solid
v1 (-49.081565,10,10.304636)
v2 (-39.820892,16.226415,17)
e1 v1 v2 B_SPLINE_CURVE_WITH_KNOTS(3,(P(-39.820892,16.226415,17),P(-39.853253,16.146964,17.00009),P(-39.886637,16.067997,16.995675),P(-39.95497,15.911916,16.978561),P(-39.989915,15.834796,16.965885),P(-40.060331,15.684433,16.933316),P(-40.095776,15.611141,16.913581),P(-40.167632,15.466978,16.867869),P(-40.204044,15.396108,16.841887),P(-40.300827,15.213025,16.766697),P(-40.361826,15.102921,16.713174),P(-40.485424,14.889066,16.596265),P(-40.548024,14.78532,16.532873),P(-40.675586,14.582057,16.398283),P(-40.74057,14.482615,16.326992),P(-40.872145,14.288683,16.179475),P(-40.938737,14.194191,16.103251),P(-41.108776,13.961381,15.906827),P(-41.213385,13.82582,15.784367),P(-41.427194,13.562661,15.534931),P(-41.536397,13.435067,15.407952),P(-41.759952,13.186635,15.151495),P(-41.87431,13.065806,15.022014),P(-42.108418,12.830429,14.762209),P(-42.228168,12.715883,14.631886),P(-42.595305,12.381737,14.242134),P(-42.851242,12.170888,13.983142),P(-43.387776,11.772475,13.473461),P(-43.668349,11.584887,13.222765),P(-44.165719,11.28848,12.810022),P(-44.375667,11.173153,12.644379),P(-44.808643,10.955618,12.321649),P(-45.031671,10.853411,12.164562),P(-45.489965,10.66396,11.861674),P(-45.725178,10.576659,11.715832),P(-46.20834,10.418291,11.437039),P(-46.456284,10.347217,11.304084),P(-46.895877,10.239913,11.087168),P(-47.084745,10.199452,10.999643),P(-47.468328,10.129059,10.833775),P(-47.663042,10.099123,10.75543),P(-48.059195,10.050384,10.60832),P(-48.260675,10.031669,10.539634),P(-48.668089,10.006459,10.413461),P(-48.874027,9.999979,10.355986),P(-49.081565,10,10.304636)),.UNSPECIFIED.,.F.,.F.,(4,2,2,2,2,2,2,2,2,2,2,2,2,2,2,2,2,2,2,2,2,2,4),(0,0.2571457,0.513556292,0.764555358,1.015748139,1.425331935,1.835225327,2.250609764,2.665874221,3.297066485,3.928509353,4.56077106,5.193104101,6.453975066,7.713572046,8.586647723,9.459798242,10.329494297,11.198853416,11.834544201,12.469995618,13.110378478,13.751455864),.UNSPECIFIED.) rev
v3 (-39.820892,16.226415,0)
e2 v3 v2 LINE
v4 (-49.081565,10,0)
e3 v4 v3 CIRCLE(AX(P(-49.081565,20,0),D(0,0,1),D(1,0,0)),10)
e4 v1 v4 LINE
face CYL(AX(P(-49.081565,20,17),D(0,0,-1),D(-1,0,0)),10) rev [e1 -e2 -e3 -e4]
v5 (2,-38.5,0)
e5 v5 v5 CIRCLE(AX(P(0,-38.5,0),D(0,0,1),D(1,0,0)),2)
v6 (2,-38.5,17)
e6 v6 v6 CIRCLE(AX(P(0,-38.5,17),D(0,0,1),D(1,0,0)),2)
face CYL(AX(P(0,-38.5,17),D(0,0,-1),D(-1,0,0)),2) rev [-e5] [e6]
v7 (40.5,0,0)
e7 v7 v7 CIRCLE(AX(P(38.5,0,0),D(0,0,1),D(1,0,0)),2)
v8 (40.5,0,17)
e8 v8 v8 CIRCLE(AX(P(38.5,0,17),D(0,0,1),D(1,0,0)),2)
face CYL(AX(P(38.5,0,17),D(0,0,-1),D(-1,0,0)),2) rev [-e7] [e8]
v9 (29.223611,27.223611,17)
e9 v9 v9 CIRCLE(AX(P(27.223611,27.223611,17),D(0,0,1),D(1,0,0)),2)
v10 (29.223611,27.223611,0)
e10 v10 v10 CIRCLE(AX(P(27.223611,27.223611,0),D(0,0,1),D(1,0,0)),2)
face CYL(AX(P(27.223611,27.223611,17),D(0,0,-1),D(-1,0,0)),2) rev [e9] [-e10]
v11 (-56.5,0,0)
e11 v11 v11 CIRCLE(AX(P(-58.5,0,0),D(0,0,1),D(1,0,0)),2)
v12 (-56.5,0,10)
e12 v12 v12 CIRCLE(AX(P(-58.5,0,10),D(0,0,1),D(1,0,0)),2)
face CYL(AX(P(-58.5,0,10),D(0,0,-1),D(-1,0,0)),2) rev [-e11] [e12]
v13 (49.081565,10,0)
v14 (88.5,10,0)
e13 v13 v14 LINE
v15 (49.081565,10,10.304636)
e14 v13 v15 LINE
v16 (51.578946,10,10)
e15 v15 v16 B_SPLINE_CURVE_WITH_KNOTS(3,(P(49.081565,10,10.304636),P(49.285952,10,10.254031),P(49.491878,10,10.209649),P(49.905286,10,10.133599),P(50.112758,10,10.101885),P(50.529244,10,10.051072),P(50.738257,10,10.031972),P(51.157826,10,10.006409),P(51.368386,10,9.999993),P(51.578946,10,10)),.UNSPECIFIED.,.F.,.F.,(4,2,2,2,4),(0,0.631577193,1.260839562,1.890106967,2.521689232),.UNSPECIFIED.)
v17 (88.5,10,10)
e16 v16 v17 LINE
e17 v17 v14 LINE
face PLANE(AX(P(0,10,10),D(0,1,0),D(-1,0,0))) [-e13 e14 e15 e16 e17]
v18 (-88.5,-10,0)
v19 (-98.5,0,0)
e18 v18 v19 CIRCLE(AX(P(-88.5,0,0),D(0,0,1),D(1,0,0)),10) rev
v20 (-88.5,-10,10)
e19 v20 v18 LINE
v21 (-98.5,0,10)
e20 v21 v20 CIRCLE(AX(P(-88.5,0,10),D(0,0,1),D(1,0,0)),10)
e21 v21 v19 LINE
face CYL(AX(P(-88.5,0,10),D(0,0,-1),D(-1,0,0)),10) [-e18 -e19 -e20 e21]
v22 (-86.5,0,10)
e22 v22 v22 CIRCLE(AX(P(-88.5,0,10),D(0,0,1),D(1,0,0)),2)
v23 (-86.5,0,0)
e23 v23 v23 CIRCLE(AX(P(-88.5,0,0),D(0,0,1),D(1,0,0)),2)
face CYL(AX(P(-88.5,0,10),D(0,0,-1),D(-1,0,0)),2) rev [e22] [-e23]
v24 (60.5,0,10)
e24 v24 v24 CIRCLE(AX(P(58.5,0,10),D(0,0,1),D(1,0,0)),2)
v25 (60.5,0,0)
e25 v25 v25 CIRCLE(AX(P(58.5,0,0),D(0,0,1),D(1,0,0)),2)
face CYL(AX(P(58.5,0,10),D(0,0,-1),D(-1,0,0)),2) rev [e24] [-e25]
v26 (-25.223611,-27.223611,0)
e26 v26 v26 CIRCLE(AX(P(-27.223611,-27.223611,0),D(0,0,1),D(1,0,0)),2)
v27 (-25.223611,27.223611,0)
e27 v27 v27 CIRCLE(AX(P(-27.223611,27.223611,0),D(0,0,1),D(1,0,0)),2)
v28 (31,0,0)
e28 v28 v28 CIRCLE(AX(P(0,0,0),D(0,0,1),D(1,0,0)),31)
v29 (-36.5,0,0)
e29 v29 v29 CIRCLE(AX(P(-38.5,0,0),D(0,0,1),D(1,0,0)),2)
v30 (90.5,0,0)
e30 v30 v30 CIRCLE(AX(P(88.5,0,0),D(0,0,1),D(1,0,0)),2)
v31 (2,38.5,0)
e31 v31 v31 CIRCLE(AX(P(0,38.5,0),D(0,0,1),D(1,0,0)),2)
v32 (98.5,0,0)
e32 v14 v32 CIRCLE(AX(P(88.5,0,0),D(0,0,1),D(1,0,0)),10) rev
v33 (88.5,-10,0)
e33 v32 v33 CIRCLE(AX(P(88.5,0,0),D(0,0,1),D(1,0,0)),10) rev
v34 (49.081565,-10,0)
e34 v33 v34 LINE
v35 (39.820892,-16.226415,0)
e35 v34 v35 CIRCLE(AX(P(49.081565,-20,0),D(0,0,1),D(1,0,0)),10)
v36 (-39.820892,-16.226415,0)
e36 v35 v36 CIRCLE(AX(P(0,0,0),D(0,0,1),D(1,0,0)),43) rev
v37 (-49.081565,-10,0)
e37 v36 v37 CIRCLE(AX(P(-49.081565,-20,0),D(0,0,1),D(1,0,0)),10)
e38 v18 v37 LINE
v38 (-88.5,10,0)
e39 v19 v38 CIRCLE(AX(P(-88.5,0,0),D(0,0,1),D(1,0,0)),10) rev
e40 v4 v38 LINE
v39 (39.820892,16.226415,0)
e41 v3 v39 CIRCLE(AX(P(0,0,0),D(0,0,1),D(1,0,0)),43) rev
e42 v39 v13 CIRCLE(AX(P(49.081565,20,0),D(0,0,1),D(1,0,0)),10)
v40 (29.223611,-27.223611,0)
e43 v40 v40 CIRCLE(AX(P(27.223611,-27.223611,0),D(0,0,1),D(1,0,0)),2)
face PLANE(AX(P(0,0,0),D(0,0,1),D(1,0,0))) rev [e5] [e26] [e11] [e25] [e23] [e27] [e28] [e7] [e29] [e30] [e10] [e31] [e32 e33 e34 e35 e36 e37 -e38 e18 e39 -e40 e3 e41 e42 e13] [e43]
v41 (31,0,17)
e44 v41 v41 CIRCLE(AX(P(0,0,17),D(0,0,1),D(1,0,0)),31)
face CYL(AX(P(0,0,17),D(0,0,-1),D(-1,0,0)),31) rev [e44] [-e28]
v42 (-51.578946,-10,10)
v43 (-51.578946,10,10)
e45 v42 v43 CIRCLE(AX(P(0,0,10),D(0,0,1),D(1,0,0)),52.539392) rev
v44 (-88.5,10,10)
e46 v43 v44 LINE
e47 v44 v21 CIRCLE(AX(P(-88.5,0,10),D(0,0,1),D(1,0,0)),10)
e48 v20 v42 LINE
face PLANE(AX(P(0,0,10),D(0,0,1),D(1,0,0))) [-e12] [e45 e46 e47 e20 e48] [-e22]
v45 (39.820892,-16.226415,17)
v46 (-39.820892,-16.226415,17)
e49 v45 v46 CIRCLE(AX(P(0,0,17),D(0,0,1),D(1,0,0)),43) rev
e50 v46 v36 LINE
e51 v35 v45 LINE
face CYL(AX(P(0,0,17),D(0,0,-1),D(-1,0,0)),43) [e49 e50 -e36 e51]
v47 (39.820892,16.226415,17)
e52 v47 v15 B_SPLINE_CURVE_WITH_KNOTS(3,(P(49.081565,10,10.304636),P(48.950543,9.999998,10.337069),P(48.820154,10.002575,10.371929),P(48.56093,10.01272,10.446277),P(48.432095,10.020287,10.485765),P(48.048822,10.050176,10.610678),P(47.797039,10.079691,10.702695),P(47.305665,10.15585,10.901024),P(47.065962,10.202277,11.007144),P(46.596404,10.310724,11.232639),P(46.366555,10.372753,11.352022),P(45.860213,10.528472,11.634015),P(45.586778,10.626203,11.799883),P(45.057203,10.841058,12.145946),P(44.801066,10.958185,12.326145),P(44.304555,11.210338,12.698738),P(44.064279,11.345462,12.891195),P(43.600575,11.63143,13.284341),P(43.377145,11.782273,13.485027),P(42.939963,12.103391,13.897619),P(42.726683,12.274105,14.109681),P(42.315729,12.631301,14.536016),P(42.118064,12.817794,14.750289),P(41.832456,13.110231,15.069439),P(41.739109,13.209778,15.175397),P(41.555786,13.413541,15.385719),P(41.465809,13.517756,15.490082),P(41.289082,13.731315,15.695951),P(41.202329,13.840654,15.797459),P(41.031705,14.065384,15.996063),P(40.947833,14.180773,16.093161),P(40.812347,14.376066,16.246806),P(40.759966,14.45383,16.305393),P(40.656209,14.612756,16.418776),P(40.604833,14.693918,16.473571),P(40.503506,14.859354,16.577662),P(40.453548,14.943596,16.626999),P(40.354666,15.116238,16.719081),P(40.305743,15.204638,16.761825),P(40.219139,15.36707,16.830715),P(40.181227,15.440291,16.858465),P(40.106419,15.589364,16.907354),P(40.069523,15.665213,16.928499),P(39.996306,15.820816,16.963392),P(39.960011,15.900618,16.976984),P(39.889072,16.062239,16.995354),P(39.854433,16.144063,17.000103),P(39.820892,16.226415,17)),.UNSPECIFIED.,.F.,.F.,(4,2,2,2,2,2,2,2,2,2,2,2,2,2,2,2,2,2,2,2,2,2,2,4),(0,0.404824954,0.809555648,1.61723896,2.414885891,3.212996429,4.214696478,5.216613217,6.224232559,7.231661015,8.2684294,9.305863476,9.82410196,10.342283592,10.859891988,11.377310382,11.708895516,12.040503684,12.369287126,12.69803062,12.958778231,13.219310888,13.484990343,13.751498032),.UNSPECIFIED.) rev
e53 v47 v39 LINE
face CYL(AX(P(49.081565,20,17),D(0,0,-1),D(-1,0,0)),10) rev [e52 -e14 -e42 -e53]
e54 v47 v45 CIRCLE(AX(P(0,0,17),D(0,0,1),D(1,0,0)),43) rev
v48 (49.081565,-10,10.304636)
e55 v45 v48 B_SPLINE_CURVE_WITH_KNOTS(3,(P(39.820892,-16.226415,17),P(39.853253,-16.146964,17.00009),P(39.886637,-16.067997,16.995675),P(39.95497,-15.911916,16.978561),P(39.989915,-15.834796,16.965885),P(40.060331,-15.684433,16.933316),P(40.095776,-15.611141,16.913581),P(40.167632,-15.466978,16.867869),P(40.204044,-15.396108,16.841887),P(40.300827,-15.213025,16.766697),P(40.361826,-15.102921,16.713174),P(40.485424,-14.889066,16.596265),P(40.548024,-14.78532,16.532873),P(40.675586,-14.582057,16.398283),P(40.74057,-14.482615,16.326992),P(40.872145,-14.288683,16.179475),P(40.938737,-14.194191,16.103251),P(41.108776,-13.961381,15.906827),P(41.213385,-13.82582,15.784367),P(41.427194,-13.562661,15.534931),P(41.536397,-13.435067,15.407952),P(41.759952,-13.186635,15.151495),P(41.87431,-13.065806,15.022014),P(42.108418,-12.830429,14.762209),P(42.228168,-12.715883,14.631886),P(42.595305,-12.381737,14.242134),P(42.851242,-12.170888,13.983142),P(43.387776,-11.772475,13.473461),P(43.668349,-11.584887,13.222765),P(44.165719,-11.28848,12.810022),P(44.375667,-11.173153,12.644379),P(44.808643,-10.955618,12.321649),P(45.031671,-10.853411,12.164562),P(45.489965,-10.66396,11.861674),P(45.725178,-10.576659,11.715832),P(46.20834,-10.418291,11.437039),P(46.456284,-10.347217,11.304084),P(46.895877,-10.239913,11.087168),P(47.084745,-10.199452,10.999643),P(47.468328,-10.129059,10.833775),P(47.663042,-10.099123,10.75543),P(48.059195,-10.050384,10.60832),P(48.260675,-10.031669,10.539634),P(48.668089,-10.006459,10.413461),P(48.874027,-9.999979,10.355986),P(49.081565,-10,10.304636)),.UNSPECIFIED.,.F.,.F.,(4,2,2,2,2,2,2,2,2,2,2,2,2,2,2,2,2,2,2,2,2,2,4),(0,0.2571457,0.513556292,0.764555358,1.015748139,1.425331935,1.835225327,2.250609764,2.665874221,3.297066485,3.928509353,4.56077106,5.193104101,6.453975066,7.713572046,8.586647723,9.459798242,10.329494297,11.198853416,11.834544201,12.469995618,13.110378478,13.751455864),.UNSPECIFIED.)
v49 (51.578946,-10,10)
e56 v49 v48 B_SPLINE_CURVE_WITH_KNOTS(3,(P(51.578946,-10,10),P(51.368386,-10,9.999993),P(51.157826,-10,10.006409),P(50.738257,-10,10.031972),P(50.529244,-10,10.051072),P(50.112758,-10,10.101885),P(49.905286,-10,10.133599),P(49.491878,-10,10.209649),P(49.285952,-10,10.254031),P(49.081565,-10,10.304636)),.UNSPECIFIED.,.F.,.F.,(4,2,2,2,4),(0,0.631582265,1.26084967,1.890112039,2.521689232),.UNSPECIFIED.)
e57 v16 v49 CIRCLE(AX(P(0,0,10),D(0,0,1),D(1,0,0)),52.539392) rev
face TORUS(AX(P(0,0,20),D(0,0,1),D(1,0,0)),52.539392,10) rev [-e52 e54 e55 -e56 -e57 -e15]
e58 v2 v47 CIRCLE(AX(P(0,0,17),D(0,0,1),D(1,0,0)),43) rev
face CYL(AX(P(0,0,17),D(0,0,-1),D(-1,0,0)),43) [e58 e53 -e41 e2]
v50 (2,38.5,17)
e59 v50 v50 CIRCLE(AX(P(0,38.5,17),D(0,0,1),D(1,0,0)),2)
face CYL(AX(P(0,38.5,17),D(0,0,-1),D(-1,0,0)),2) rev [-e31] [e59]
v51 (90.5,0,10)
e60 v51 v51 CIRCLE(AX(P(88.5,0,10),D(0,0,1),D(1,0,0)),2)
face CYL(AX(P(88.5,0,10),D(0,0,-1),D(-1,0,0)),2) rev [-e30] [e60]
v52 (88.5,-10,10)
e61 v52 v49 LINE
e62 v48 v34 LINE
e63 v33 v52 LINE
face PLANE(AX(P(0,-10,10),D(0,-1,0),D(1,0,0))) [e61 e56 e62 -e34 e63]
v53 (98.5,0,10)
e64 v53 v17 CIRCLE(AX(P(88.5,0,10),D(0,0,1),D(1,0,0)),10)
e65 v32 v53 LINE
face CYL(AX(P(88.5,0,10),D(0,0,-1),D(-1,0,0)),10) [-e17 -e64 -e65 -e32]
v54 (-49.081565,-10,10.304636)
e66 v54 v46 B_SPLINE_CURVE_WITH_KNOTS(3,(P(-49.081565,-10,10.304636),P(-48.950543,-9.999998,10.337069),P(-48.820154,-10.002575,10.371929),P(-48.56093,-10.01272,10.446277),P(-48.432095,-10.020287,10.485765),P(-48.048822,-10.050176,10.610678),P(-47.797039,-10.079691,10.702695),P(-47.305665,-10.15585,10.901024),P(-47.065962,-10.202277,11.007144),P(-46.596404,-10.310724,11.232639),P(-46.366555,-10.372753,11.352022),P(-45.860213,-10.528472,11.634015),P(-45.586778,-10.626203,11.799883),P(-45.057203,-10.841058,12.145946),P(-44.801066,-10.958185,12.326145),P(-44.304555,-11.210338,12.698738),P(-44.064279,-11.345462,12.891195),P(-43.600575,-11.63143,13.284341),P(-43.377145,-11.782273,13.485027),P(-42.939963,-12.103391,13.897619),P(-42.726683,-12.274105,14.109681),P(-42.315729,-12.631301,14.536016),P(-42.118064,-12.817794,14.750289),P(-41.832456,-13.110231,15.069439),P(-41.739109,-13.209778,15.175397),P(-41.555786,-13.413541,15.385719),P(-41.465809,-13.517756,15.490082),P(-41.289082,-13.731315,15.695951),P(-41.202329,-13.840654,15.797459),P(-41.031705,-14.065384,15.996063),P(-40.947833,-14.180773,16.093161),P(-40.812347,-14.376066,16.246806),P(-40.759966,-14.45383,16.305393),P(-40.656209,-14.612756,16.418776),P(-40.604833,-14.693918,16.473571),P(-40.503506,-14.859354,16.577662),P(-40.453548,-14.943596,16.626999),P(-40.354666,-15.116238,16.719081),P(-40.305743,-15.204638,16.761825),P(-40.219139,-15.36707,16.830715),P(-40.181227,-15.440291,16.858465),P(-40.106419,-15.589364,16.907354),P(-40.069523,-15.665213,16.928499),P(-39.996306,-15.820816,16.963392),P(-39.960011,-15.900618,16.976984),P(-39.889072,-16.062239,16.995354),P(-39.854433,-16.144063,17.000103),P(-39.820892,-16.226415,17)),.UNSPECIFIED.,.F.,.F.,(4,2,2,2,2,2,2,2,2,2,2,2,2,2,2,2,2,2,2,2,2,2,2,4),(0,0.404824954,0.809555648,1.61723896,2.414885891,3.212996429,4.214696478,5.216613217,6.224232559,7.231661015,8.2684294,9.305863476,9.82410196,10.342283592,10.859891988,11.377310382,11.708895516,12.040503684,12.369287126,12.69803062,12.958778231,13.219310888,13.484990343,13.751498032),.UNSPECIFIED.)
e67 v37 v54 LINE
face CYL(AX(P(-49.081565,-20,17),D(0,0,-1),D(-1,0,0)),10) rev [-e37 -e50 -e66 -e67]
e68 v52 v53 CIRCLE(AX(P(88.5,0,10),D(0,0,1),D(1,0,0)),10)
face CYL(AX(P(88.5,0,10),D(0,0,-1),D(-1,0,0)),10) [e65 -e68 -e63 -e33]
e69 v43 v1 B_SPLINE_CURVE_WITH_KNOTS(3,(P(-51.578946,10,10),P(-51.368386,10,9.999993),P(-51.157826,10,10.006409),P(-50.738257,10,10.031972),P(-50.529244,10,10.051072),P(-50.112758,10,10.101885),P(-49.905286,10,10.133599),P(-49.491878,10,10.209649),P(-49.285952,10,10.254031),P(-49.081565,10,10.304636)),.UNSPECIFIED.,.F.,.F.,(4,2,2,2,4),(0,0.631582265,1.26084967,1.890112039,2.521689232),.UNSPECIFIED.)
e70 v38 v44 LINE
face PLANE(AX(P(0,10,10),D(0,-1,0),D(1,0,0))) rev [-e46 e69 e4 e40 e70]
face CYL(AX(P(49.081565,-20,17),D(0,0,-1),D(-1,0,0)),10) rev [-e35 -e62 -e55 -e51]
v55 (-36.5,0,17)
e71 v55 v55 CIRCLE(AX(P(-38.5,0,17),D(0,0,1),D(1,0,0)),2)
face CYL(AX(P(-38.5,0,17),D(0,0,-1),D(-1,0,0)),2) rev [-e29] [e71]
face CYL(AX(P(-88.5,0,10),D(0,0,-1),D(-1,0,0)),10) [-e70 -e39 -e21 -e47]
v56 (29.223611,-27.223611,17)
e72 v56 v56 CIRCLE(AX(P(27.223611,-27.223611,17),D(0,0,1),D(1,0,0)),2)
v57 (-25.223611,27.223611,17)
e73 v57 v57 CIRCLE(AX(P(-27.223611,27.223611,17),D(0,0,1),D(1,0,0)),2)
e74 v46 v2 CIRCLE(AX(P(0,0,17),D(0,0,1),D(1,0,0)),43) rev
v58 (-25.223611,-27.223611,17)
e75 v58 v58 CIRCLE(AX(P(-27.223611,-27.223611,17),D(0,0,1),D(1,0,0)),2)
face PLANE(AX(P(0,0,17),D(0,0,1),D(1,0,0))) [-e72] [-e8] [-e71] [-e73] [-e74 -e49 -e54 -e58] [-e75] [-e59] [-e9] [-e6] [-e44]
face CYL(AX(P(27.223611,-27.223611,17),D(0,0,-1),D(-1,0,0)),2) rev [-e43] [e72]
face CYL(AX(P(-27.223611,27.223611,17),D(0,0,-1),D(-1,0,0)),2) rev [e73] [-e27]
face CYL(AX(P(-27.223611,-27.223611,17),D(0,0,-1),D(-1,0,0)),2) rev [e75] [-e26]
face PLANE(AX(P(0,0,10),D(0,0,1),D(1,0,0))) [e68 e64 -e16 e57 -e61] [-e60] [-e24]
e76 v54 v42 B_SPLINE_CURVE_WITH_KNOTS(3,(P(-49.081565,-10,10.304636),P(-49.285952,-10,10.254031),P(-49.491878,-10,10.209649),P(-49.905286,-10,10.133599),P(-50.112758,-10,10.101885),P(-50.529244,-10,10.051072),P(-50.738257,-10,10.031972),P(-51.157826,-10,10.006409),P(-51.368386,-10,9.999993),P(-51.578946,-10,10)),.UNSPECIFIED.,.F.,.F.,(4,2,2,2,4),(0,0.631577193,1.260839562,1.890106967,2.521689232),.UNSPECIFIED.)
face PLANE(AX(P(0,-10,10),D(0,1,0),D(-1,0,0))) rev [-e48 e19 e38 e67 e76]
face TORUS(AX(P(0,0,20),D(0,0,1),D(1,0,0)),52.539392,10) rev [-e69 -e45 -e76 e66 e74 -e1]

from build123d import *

# Parameters (mm, degrees)
SKETCH1_R           = 2
SKETCH1_R_2         = 31
BOSS_EXTRUDE1_DEPTH = 17
SKETCH1_3_R         = 2
BOSS_EXTRUDE2_DEPTH = 10
FILLET1_R           = 10
FILLET2_R           = 10


# Some blends are built 0.0001 mm under size
with BuildPart() as part:
    # Sketch1 → Boss-Extrude1 (new body)
    with BuildSketch(Plane.XY):
        with BuildLine():
            ThreePointArc((41.821047333, 10), (0, 43), (-41.821047333, 10))
            ThreePointArc((-41.821047333, 10), (-43, 0), (-41.821047333, -10))
            ThreePointArc((-41.821047333, -10), (-41.80718648, -10.057790941), (-41.793245769, -10.11556267))
            ThreePointArc((-41.793245769, -10.11556267), (-0.129174326, -42.999805976), (41.731716335, -10.366477306))
            ThreePointArc((41.731716335, -10.366477306), (41.776783691, -10.183336608), (41.821047333, -10))
            ThreePointArc((41.821047333, -10), (43, 0), (41.821047333, 10))
        make_face()
        with Locations((-27.223611076, -27.223611076)):
            Circle(SKETCH1_R, mode=Mode.SUBTRACT)
        with Locations((0, -38.5)):
            Circle(SKETCH1_R, mode=Mode.SUBTRACT)
        with Locations((27.223611076, -27.223611076)):
            Circle(SKETCH1_R, mode=Mode.SUBTRACT)
        with Locations((-38.5, 0)):
            Circle(SKETCH1_R, mode=Mode.SUBTRACT)
        with Locations((-27.223611076, 27.223611076)):
            Circle(SKETCH1_R, mode=Mode.SUBTRACT)
        Circle(SKETCH1_R_2, mode=Mode.SUBTRACT)
        with Locations((38.5, 0)):
            Circle(SKETCH1_R, mode=Mode.SUBTRACT)
        with Locations((27.223611076, 27.223611076)):
            Circle(SKETCH1_R, mode=Mode.SUBTRACT)
        with Locations((0, 38.5)):
            Circle(SKETCH1_R, mode=Mode.SUBTRACT)
    extrude(amount=BOSS_EXTRUDE1_DEPTH)

    # Sketch1<3> → Boss-Extrude2 (add)
    # profile 1 of 2: a face of its own
    with BuildSketch(Plane.XY):
        with BuildLine():
            ThreePointArc((-41.821047333, -10), (-43, 0), (-41.821047333, 10))
            Line((-41.821047333, 10), (-98.5, 10))
            Line((-98.5, 10), (-98.5, -10))
            Line((-98.5, -10), (-41.821047333, -10))
        make_face()
        with Locations((-88.5, 0)):
            Circle(SKETCH1_3_R, mode=Mode.SUBTRACT)
        with Locations((-58.5, 0)):
            Circle(SKETCH1_3_R, mode=Mode.SUBTRACT)
    # profile 2 of 2: a face of its own
    with BuildSketch(Plane.XY):
        with BuildLine():
            Line((98.5, 10), (41.821047333, 10))
            ThreePointArc((41.821047333, 10), (43, 0), (41.821047333, -10))
            Line((41.821047333, -10), (98.5, -10))
            Line((98.5, -10), (98.5, 10))
        make_face()
        with Locations((58.5, 0)):
            Circle(SKETCH1_3_R, mode=Mode.SUBTRACT)
        with Locations((88.5, 0)):
            Circle(SKETCH1_3_R, mode=Mode.SUBTRACT)
    extrude(amount=BOSS_EXTRUDE2_DEPTH)

    # Fillet1
    # the kernel refuses this fillet: 10 mm, written as the material it adds along each edge
    with BuildSketch(Plane(origin=(0, 0, 10), x_dir=(-0.7043119936118605, -0.7098905659709015, 0), z_dir=(0.7098905659709015, -0.7043119936118605, 0))) as fillet1_piece_1_section:
        with BuildLine():
            CenterArc((52.539392014, -10), FILLET1_R, 90, 72.542396876)
            Line((52.539392014, 0), (52.539392014, 0.2))
            Line((52.539392014, 0.2), (43, 0.2))
            Line((43, 0.2), (42.8, 0))
            ThreePointArc((42.8, 0), (42.8, -3.5), (42.80921216, -6.94))
            Line((42.80921216, -6.94), (43, -7))
        make_face()
    fillet1_piece_1 = revolve(axis=Axis((0, 0, 10), (0, 0, -1)), revolution_arc=90.452024347, mode=Mode.PRIVATE)
    fillet1_piece_1 = split(fillet1_piece_1, bisect_by=Plane(origin=(-44.895509483, 10, 11.788543671), z_dir=(0, -1, 0)), keep=Keep.TOP, mode=Mode.PRIVATE)
    fillet1_piece_1 = split(fillet1_piece_1, bisect_by=Plane(origin=(-44.895509483, -10, 11.788543671), z_dir=(0, 1, 0)), keep=Keep.TOP, mode=Mode.PRIVATE)
    add(fillet1_piece_1)
    with BuildSketch(Plane(origin=(-41.821047333, -10, 0), x_dir=(0.30584389927154154, -0.952081671537888, 0), z_dir=(0, 0, 1)), Plane(origin=(41.821047333, 10, 0), x_dir=(-0.30584389927146016, 0.9520816715379143, 0), z_dir=(0, 0, 1))) as fillet1_piece_2:
        with BuildLine():
            CenterArc((7.300231752, -9.971044568), FILLET1_R, 94.36121506, 67.829842836)
            Line((-2.220584963, -6.912605575), (-2.411001297, -6.851436795))
            Line((-2.411001297, -6.851436795), (-0.190416334, 0.06116878))
            Line((-0.190416334, 0.06116878), (0.015208816, 0.199420891))
            ThreePointArc((0.015208816, 0.199420891), (3.269895472, 0.075491643), (6.524582129, 0.199420891))
            Line((6.524582129, 0.199420891), (6.539790945, 0))
        make_face()
    extrude(amount=10)
    with BuildSketch(Plane(origin=(-41.821047333, 10, 0), x_dir=(0.3058438992715413, 0.9520816715378883, 0), z_dir=(0, 0, 1)), Plane(origin=(41.821047333, -10, 0), x_dir=(-0.30584389927145916, -0.9520816715379147, 0), z_dir=(0, 0, 1))) as fillet1_piece_3:
        with BuildLine():
            CenterArc((7.300231752, 9.971044568), FILLET1_R, 197.808942104, 67.829842836)
            Line((-2.220584963, 6.912605575), (-2.411001297, 6.851436795))
            Line((-2.411001297, 6.851436795), (-0.190416334, -0.06116878))
            Line((-0.190416334, -0.06116878), (0.015208816, -0.199420891))
            ThreePointArc((0.015208816, -0.199420891), (3.269895472, -0.075491643), (6.524582129, -0.199420891))
            Line((6.524582129, -0.199420891), (6.539790945, 0))
        make_face()
    extrude(amount=10)
    with BuildSketch(Plane(origin=(0, 0, 10), x_dir=(0.7043119936118566, 0.709890565970905, 0), z_dir=(-0.709890565970905, 0.7043119936118566, 0))) as fillet1_piece_4_section:
        with BuildLine():
            CenterArc((52.539392014, -10), FILLET1_R, 90, 72.542396876)
            Line((52.539392014, 0), (52.539392014, 0.2))
            Line((52.539392014, 0.2), (43, 0.2))
            Line((43, 0.2), (42.8, 0))
            ThreePointArc((42.8, 0), (42.8, -3.5), (42.80921216, -6.94))
            Line((42.80921216, -6.94), (43, -7))
        make_face()
    fillet1_piece_4 = revolve(axis=Axis((0, 0, 10), (0, 0, -1)), revolution_arc=90.452024347, mode=Mode.PRIVATE)
    fillet1_piece_4 = split(fillet1_piece_4, bisect_by=Plane(origin=(44.895509483, -10, 11.788543671), z_dir=(0, 1, 0)), keep=Keep.TOP, mode=Mode.PRIVATE)
    fillet1_piece_4 = split(fillet1_piece_4, bisect_by=Plane(origin=(44.895509483, 10, 11.788543671), z_dir=(0, -1, 0)), keep=Keep.TOP, mode=Mode.PRIVATE)
    add(fillet1_piece_4)
    with BuildSketch(Plane(origin=(0, 0, 10), x_dir=(-0.7043119936118605, -0.7098905659709015, 0), z_dir=(0.7098905659709015, -0.7043119936118605, 0))) as fillet1_piece_5a_section:
        with BuildLine():
            CenterArc((52.539392014, -10), FILLET1_R, 90, 72.542396876)
            Line((52.539392014, 0), (52.539392014, 0.2))
            Line((52.539392014, 0.2), (43, 0.2))
            Line((43, 0.2), (42.8, 0))
            ThreePointArc((42.8, 0), (42.8, -3.5), (42.80921216, -6.94))
            Line((42.80921216, -6.94), (43, -7))
        make_face()
    fillet1_piece_5a = revolve(axis=Axis((0, 0, 10), (0, 0, -1)), revolution_arc=90.452024347, mode=Mode.PRIVATE)
    fillet1_piece_5a = split(fillet1_piece_5a, bisect_by=Plane(origin=(-39.191113565, -10, 11.725292832), z_dir=(0, -1, 0)), keep=Keep.TOP, mode=Mode.PRIVATE)
    with BuildSketch(Plane(origin=(-41.821047333, -10, 0), x_dir=(0.30584389927154154, -0.952081671537888, 0), z_dir=(0, 0, 1))) as fillet1_piece_5b_section:
        with BuildLine():
            CenterArc((7.300231752, -9.971044568), FILLET1_R, 94.36121506, 67.829842836)
            Line((-2.220584963, -6.912605575), (-2.411001297, -6.851436795))
            Line((-2.411001297, -6.851436795), (-0.190416334, 0.06116878))
            Line((-0.190416334, 0.06116878), (0.015208816, 0.199420891))
            ThreePointArc((0.015208816, 0.199420891), (3.269895472, 0.075491643), (6.524582129, 0.199420891))
            Line((6.524582129, 0.199420891), (6.539790945, 0))
        make_face()
    fillet1_piece_5b = extrude(amount=28.151293586, mode=Mode.PRIVATE)
    fillet1_piece_5b = split(fillet1_piece_5b, bisect_by=Plane(origin=(-43.086853449, -11.367069141, 17), z_dir=(0, 0, -1)), keep=Keep.TOP, mode=Mode.PRIVATE)
    fillet1_piece_5b = split(fillet1_piece_5b, bisect_by=Plane(origin=(-43.086853449, -11.367069141, 10), z_dir=(0, 0, 1)), keep=Keep.TOP, mode=Mode.PRIVATE)
    fillet1_piece_5 = fillet1_piece_5a & fillet1_piece_5b
    add(fillet1_piece_5)
    with BuildSketch(Plane(origin=(-41.821047333, 10, 0), x_dir=(0.3058438992715413, 0.9520816715378883, 0), z_dir=(0, 0, 1))) as fillet1_piece_6a_section:
        with BuildLine():
            CenterArc((7.300231752, 9.971044568), FILLET1_R, 197.808942104, 67.829842836)
            Line((-2.220584963, 6.912605575), (-2.411001297, 6.851436795))
            Line((-2.411001297, 6.851436795), (-0.190416334, -0.06116878))
            Line((-0.190416334, -0.06116878), (0.015208816, -0.199420891))
            ThreePointArc((0.015208816, -0.199420891), (3.269895472, -0.075491643), (6.524582129, -0.199420891))
            Line((6.524582129, -0.199420891), (6.539790945, 0))
        make_face()
    fillet1_piece_6a = extrude(amount=28.151293586, mode=Mode.PRIVATE)
    fillet1_piece_6a = split(fillet1_piece_6a, bisect_by=Plane(origin=(-43.086853449, 11.367069141, 17), z_dir=(0, 0, -1)), keep=Keep.TOP, mode=Mode.PRIVATE)
    fillet1_piece_6a = split(fillet1_piece_6a, bisect_by=Plane(origin=(-43.086853449, 11.367069141, 10), z_dir=(0, 0, 1)), keep=Keep.TOP, mode=Mode.PRIVATE)
    with BuildSketch(Plane(origin=(0, 0, 10), x_dir=(-0.7043119936118605, -0.7098905659709015, 0), z_dir=(0.7098905659709015, -0.7043119936118605, 0))) as fillet1_piece_6b_section:
        with BuildLine():
            CenterArc((52.539392014, -10), FILLET1_R, 90, 72.542396876)
            Line((52.539392014, 0), (52.539392014, 0.2))
            Line((52.539392014, 0.2), (43, 0.2))
            Line((43, 0.2), (42.8, 0))
            ThreePointArc((42.8, 0), (42.8, -3.5), (42.80921216, -6.94))
            Line((42.80921216, -6.94), (43, -7))
        make_face()
    fillet1_piece_6b = revolve(axis=Axis((0, 0, 10), (0, 0, -1)), revolution_arc=90.452024347, mode=Mode.PRIVATE)
    fillet1_piece_6b = split(fillet1_piece_6b, bisect_by=Plane(origin=(-39.191113142, 10, 11.725292885), z_dir=(0, 1, 0)), keep=Keep.TOP, mode=Mode.PRIVATE)
    fillet1_piece_6 = fillet1_piece_6a & fillet1_piece_6b
    add(fillet1_piece_6)
    with BuildSketch(Plane(origin=(0, 0, 10), x_dir=(0.7043119936118566, 0.709890565970905, 0), z_dir=(-0.709890565970905, 0.7043119936118566, 0))) as fillet1_piece_7a_section:
        with BuildLine():
            CenterArc((52.539392014, -10), FILLET1_R, 90, 72.542396876)
            Line((52.539392014, 0), (52.539392014, 0.2))
            Line((52.539392014, 0.2), (43, 0.2))
            Line((43, 0.2), (42.8, 0))
            ThreePointArc((42.8, 0), (42.8, -3.5), (42.80921216, -6.94))
            Line((42.80921216, -6.94), (43, -7))
        make_face()
    fillet1_piece_7a = revolve(axis=Axis((0, 0, 10), (0, 0, -1)), revolution_arc=90.452024347, mode=Mode.PRIVATE)
    fillet1_piece_7a = split(fillet1_piece_7a, bisect_by=Plane(origin=(39.191113565, 10, 11.725292832), z_dir=(0, 1, 0)), keep=Keep.TOP, mode=Mode.PRIVATE)
    with BuildSketch(Plane(origin=(41.821047333, 10, 0), x_dir=(-0.30584389927146016, 0.9520816715379143, 0), z_dir=(0, 0, 1))) as fillet1_piece_7b_section:
        with BuildLine():
            CenterArc((7.300231752, -9.971044568), FILLET1_R, 94.36121506, 67.829842836)
            Line((-2.220584963, -6.912605575), (-2.411001297, -6.851436795))
            Line((-2.411001297, -6.851436795), (-0.190416334, 0.06116878))
            Line((-0.190416334, 0.06116878), (0.015208816, 0.199420891))
            ThreePointArc((0.015208816, 0.199420891), (3.269895472, 0.075491643), (6.524582129, 0.199420891))
            Line((6.524582129, 0.199420891), (6.539790945, 0))
        make_face()
    fillet1_piece_7b = extrude(amount=28.151293586, mode=Mode.PRIVATE)
    fillet1_piece_7b = split(fillet1_piece_7b, bisect_by=Plane(origin=(43.086853449, 11.367069141, 17), z_dir=(0, 0, -1)), keep=Keep.TOP, mode=Mode.PRIVATE)
    fillet1_piece_7b = split(fillet1_piece_7b, bisect_by=Plane(origin=(43.086853449, 11.367069141, 10), z_dir=(0, 0, 1)), keep=Keep.TOP, mode=Mode.PRIVATE)
    fillet1_piece_7 = fillet1_piece_7a & fillet1_piece_7b
    add(fillet1_piece_7)
    with BuildSketch(Plane(origin=(41.821047333, -10, 0), x_dir=(-0.30584389927145916, -0.9520816715379147, 0), z_dir=(0, 0, 1))) as fillet1_piece_8a_section:
        with BuildLine():
            CenterArc((7.300231752, 9.971044568), FILLET1_R, 197.808942104, 67.829842836)
            Line((-2.220584963, 6.912605575), (-2.411001297, 6.851436795))
            Line((-2.411001297, 6.851436795), (-0.190416334, -0.06116878))
            Line((-0.190416334, -0.06116878), (0.015208816, -0.199420891))
            ThreePointArc((0.015208816, -0.199420891), (3.269895472, -0.075491643), (6.524582129, -0.199420891))
            Line((6.524582129, -0.199420891), (6.539790945, 0))
        make_face()
    fillet1_piece_8a = extrude(amount=28.151293586, mode=Mode.PRIVATE)
    fillet1_piece_8a = split(fillet1_piece_8a, bisect_by=Plane(origin=(43.086853449, -11.367069141, 17), z_dir=(0, 0, -1)), keep=Keep.TOP, mode=Mode.PRIVATE)
    fillet1_piece_8a = split(fillet1_piece_8a, bisect_by=Plane(origin=(43.086853449, -11.367069141, 10), z_dir=(0, 0, 1)), keep=Keep.TOP, mode=Mode.PRIVATE)
    with BuildSketch(Plane(origin=(0, 0, 10), x_dir=(0.7043119936118566, 0.709890565970905, 0), z_dir=(-0.709890565970905, 0.7043119936118566, 0))) as fillet1_piece_8b_section:
        with BuildLine():
            CenterArc((52.539392014, -10), FILLET1_R, 90, 72.542396876)
            Line((52.539392014, 0), (52.539392014, 0.2))
            Line((52.539392014, 0.2), (43, 0.2))
            Line((43, 0.2), (42.8, 0))
            ThreePointArc((42.8, 0), (42.8, -3.5), (42.80921216, -6.94))
            Line((42.80921216, -6.94), (43, -7))
        make_face()
    fillet1_piece_8b = revolve(axis=Axis((0, 0, 10), (0, 0, -1)), revolution_arc=90.452024347, mode=Mode.PRIVATE)
    fillet1_piece_8b = split(fillet1_piece_8b, bisect_by=Plane(origin=(39.191113142, -10, 11.725292885), z_dir=(0, -1, 0)), keep=Keep.TOP, mode=Mode.PRIVATE)
    fillet1_piece_8 = fillet1_piece_8a & fillet1_piece_8b
    add(fillet1_piece_8)

    # Fillet2
    fillet2_edges = [part.edges().sort_by_distance(p)[0] for p in [
        (98.5, -10, 5),
        (98.5, 10, 5),
        (-98.5, -10, 5),
        (-98.5, 10, 5),
    ]]
    fillet(fillet2_edges, radius=FILLET2_R - 0.0001)  # a hair under: the kernel refuses the full size


solid = part.part
